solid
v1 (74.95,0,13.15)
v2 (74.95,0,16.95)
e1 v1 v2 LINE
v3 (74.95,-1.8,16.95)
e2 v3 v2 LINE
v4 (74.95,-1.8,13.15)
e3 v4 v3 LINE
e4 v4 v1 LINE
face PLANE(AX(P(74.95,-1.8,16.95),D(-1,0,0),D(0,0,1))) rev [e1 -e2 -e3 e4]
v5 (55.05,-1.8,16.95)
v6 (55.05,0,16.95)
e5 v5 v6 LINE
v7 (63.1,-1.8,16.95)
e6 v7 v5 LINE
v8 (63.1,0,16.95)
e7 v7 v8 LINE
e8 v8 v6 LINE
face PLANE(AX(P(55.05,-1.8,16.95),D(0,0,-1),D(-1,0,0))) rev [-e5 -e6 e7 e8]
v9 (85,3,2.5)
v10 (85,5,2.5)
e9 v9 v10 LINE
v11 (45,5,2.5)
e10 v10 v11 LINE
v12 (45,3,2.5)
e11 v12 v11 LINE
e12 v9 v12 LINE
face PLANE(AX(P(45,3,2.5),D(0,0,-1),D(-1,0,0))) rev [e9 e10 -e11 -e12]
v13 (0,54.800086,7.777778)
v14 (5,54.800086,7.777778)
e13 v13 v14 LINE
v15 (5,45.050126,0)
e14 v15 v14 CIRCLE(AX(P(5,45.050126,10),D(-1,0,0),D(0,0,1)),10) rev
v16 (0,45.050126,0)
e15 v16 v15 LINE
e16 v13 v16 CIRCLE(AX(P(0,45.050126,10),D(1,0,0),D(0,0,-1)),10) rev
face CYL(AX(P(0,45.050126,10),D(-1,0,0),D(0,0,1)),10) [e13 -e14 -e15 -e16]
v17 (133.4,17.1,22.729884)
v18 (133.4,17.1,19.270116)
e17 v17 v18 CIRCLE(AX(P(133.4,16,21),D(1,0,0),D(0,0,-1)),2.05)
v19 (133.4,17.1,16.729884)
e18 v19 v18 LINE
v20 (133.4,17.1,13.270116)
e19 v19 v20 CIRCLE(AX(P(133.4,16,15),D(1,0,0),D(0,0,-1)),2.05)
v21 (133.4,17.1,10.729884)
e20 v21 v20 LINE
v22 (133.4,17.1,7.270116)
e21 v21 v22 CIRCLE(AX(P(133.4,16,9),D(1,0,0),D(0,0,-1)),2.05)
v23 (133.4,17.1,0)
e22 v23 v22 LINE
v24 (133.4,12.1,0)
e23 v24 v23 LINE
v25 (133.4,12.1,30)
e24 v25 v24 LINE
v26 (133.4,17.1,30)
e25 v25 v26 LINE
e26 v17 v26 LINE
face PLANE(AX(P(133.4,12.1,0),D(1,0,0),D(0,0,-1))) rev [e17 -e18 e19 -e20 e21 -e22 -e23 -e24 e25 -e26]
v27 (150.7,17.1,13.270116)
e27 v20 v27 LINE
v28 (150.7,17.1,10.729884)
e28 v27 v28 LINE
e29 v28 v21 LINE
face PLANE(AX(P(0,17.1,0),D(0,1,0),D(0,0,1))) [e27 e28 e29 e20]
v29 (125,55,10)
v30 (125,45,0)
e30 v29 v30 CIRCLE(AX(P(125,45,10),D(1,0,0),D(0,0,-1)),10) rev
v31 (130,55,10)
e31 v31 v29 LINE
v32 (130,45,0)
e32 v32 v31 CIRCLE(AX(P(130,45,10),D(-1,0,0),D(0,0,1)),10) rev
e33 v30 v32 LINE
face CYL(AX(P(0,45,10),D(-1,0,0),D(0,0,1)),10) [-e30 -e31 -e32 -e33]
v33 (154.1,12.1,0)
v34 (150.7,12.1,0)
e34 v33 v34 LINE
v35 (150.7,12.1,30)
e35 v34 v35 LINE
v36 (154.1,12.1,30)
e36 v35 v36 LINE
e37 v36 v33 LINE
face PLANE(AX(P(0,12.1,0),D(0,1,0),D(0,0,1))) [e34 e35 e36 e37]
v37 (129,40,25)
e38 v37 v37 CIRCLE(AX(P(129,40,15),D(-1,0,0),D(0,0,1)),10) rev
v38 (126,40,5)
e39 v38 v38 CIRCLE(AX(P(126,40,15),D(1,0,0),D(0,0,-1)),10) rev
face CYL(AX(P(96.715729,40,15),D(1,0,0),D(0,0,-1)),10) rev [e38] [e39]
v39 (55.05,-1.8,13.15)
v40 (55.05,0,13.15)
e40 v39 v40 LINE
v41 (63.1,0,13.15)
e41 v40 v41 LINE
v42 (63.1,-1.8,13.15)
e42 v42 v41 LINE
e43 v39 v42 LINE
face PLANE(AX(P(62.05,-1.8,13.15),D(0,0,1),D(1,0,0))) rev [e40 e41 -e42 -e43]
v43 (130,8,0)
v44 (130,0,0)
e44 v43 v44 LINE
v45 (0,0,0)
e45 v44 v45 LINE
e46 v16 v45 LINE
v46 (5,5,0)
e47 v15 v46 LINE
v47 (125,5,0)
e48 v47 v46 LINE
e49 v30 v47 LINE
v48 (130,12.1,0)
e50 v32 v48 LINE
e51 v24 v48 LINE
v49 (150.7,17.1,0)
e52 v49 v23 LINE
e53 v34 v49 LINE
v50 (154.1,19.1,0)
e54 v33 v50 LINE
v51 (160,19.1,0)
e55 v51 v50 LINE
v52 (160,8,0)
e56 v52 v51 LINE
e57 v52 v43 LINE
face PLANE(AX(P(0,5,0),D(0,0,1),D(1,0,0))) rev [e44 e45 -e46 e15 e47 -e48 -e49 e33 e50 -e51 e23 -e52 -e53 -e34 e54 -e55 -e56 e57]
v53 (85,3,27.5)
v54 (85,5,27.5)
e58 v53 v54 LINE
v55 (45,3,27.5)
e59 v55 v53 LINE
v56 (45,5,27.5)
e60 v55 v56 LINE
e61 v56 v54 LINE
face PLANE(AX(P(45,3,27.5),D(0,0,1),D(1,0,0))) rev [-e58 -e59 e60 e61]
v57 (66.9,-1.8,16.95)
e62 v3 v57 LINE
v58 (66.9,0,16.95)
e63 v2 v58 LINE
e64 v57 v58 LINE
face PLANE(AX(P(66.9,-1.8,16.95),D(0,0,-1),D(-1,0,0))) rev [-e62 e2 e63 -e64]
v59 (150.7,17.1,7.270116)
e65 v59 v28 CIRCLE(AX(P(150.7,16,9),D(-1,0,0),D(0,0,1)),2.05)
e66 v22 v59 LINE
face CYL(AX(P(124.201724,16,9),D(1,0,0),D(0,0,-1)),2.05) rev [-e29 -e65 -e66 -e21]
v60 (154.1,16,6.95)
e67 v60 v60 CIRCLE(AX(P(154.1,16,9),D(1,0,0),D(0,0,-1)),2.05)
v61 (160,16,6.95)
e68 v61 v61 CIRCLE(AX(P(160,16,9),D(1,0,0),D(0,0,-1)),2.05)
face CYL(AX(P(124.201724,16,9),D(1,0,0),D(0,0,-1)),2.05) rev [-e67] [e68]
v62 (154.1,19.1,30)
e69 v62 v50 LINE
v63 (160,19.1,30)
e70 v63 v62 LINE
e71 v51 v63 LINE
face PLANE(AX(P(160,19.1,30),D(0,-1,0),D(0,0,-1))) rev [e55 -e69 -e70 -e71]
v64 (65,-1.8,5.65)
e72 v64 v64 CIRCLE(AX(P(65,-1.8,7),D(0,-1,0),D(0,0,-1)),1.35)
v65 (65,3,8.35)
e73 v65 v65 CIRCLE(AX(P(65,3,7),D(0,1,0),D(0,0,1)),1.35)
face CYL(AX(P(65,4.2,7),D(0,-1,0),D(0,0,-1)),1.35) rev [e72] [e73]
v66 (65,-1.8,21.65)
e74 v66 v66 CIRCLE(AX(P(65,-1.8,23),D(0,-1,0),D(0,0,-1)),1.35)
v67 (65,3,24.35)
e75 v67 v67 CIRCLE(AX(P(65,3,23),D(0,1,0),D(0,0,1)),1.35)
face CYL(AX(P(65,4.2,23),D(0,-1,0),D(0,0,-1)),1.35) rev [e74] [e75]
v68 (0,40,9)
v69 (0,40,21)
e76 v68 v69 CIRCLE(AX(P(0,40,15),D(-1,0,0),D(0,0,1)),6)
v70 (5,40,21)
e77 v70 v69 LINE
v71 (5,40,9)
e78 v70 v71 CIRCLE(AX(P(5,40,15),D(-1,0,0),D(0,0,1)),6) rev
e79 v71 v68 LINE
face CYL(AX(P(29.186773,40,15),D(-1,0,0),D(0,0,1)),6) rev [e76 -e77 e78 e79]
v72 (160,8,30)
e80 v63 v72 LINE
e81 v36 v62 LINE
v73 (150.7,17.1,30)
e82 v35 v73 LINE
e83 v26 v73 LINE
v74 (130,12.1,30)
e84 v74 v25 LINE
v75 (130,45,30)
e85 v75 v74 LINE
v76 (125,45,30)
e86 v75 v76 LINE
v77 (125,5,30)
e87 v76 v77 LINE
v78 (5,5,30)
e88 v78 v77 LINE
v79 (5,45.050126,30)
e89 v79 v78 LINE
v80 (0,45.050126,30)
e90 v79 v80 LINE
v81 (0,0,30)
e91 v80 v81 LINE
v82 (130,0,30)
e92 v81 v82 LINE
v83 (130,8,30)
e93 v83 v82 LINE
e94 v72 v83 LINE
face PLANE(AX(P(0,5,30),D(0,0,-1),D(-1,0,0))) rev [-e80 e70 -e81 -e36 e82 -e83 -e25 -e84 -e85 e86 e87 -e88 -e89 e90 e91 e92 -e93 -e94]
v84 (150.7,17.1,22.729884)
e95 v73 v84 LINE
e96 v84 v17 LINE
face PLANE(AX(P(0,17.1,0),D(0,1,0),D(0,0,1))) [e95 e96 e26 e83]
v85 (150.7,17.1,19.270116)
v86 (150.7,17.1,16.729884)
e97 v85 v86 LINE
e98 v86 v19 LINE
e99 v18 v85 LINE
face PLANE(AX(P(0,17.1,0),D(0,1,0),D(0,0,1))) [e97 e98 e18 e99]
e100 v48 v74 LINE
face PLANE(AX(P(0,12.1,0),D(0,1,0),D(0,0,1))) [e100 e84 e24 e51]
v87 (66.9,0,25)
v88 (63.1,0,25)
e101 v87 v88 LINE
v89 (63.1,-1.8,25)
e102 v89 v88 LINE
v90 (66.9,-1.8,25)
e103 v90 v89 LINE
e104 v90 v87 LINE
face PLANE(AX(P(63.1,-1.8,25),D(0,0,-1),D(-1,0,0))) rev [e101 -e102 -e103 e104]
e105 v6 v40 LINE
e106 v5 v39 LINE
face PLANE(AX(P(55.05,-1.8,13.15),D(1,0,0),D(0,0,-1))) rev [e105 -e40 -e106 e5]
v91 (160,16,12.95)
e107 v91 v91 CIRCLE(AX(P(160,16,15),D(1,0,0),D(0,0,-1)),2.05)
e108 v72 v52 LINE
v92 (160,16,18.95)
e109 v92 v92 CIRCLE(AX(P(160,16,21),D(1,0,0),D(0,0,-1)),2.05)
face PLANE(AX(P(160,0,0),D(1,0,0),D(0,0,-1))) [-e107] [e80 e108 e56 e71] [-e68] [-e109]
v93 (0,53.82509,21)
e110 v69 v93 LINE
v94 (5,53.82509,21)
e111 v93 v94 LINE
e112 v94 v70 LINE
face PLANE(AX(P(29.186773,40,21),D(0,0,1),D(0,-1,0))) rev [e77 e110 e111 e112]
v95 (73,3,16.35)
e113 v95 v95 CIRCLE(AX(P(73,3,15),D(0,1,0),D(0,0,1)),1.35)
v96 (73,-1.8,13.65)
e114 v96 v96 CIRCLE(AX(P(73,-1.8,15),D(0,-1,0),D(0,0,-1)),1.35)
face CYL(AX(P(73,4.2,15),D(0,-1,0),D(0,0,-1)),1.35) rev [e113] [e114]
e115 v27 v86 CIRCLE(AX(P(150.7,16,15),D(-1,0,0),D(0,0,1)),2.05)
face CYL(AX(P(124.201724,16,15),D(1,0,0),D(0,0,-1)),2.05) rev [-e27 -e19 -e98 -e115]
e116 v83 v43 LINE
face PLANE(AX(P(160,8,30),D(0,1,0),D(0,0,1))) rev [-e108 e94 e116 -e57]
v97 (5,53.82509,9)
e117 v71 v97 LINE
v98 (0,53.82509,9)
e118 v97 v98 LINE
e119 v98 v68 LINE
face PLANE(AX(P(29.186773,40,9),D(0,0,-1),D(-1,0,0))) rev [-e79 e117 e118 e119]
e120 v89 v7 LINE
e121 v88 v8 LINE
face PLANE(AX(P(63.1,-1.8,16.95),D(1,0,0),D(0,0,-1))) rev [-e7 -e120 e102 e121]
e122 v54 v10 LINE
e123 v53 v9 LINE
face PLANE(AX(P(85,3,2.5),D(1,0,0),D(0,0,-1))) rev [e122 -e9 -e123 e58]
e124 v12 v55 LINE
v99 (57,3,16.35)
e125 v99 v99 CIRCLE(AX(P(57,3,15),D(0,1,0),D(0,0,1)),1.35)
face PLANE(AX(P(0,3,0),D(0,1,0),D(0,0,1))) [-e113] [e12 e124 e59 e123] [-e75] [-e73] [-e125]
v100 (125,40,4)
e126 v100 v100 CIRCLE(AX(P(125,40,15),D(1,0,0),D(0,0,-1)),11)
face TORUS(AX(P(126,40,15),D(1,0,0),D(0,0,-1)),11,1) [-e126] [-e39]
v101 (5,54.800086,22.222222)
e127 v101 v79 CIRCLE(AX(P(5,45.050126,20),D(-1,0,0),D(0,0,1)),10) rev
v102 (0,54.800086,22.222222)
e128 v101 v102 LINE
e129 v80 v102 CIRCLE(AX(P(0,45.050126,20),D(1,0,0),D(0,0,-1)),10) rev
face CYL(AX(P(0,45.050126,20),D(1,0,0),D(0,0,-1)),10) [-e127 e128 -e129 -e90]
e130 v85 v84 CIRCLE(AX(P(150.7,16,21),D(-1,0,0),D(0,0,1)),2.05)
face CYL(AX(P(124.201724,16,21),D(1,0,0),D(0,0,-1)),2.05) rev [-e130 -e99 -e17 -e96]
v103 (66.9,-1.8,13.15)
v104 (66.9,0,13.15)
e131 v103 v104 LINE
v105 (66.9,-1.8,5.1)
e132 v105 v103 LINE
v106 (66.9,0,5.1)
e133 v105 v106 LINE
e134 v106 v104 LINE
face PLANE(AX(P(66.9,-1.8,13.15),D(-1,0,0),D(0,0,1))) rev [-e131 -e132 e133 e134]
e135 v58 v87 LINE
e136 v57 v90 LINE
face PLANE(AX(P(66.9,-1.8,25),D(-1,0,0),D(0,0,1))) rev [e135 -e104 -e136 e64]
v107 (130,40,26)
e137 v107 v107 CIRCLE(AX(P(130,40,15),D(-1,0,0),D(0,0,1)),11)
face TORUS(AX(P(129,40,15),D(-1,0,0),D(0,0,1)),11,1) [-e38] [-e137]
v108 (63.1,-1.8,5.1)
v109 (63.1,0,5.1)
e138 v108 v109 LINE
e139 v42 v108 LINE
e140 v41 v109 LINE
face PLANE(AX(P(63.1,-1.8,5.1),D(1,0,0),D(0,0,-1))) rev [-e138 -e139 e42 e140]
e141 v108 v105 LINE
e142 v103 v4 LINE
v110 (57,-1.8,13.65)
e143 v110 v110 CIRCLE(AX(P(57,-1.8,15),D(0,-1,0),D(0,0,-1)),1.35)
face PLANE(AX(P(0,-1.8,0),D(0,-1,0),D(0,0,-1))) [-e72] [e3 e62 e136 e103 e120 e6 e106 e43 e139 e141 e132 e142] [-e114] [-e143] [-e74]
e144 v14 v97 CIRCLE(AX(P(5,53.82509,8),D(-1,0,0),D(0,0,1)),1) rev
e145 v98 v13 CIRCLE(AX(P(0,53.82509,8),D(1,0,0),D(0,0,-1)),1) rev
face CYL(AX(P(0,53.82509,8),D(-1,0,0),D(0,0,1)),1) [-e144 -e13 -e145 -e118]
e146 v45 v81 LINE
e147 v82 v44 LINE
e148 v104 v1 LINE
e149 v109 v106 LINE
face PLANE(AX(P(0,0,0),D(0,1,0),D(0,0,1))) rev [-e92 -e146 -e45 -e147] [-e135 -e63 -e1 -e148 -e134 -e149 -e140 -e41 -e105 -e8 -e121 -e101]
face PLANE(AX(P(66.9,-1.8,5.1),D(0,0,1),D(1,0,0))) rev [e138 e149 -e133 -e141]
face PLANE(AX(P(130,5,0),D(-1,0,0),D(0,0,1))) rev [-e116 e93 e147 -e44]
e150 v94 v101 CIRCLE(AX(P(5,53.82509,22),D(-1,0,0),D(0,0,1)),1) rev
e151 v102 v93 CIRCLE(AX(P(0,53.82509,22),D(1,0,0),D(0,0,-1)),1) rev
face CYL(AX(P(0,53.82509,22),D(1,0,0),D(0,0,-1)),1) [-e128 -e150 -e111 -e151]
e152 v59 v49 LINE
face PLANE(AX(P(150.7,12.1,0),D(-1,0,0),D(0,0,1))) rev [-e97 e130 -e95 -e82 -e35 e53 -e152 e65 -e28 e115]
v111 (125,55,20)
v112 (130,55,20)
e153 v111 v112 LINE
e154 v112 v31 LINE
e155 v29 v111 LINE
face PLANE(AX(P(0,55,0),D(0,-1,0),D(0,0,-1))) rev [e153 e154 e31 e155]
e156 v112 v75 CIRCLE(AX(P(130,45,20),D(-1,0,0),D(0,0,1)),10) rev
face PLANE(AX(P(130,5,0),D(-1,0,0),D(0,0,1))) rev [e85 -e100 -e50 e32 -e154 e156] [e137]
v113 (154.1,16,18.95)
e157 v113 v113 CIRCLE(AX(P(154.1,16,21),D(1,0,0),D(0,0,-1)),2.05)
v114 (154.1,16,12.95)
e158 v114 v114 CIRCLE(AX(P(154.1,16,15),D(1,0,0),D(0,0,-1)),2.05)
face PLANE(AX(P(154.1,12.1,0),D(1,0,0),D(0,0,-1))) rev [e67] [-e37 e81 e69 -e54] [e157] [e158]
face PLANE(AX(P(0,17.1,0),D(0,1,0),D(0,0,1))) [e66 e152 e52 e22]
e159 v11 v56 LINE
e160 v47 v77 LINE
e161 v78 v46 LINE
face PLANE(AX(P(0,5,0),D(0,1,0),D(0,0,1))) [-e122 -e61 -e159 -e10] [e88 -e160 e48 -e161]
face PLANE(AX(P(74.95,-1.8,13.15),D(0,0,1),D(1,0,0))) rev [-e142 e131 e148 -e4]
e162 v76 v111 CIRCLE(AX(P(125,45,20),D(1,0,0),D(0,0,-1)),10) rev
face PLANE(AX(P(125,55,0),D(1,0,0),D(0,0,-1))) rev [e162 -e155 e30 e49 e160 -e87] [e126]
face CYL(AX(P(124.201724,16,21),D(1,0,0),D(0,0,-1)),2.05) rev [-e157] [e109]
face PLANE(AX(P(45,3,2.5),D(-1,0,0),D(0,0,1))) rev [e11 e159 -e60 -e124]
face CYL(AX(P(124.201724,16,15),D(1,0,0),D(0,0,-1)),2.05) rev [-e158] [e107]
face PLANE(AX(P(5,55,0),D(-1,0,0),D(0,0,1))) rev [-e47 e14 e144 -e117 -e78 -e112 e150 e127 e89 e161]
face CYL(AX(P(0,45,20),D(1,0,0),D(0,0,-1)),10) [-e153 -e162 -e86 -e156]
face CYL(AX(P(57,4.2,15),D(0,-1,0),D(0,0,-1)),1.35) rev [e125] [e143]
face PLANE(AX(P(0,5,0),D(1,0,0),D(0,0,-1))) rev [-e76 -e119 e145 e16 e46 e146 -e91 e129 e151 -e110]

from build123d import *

# Parameters (mm, degrees)
SKETCH1_W           = 130
SKETCH1_H           = 30
BOSS_EXTRUDE1_DEPTH = 5
BOSS_EXTRUDE3_DEPTH = 1.8
SKETCH6_W           = 40
SKETCH6_H           = 25
CUT_EXTRUDE2_DEPTH  = 2
SKETCH5_R           = 1.35
CUT_EXTRUDE3_DEPTH  = 6
SKETCH8_W           = 5
SKETCH8_H           = 30
BOSS_EXTRUDE4_DEPTH = 50
SKETCH9_R           = 10
CUT_EXTRUDE4_DEPTH  = 5
SKETCH10_W          = 30
SKETCH10_H          = 11.1
BOSS_EXTRUDE5_DEPTH = 30
SKETCH11_W          = 3.4
SKETCH11_H          = 30
CUT_EXTRUDE5_DEPTH  = 7
CUT_EXTRUDE6_REACH  = 173.828
SKETCH12_R          = 2.05
CUT_EXTRUDE7_DEPTH  = 5
SKETCH14_W          = 17.3
SKETCH14_H          = 30
CUT_EXTRUDE8_DEPTH  = 2
FILLET1_R           = 10
FILLET3_R           = 1
FILLET6_R           = 1


with BuildPart() as part:
    # Sketch1 → Boss-Extrude1 (new body)
    with BuildSketch(Plane(origin=(0, 0, 0), x_dir=(1, 0, 0), z_dir=(0, 1, 0))):
        with Locations((65, -15)):
            Rectangle(SKETCH1_W, SKETCH1_H)
    extrude(amount=BOSS_EXTRUDE1_DEPTH)

    # Sketch4 → Boss-Extrude3 (add)
    with BuildSketch(Plane.XZ):
        Polygon((63.1, 25), (66.9, 25), (66.9, 17), (66.9, 16.95), (67.95, 16.95), (74.95, 16.95), (74.95, 13.15), (66.95, 13.15), (66.9, 13.15), (66.9, 12.1), (66.9, 5.1), (63.1, 5.1), (63.1, 13.1), (63.1, 13.15), (62.05, 13.15), (55.05, 13.15), (55.05, 16.95), (63.05, 16.95), (63.1, 16.95), (63.1, 18), align=None)
    extrude(amount=BOSS_EXTRUDE3_DEPTH)

    # Sketch6 → Cut-Extrude2 (cut)
    with BuildSketch(Plane(origin=(0, 5, 0), x_dir=(1, 0, 0), z_dir=(0, 1, 0))):
        with Locations((65, -15)):
            Rectangle(SKETCH6_W, SKETCH6_H)
    extrude(amount=-CUT_EXTRUDE2_DEPTH, mode=Mode.SUBTRACT)

    # Sketch5 → Cut-Extrude3 (cut)
    with BuildSketch(Plane.XZ.offset(1.8)):
        with Locations(Location((65, 23, 0), (0, 0, 270))):
            Circle(SKETCH5_R)
        with Locations(Location((73, 15, 0), (0, 0, 270))):
            Circle(SKETCH5_R)
        with Locations(Location((57, 15, 0), (0, 0, 270))):
            Circle(SKETCH5_R)
        with Locations(Location((65, 7, 0), (0, 0, 270))):
            Circle(SKETCH5_R)
    extrude(amount=-CUT_EXTRUDE3_DEPTH, mode=Mode.SUBTRACT)

    # Sketch8 → Boss-Extrude4 (add)
    with BuildSketch(Plane(origin=(0, 5, 0), x_dir=(1, 0, 0), z_dir=(0, 1, 0))):
        with Locations((2.5, -15)):
            Rectangle(SKETCH8_W, SKETCH8_H)
        with Locations((127.5, -15)):
            Rectangle(SKETCH8_W, SKETCH8_H)
    extrude(amount=BOSS_EXTRUDE4_DEPTH)

    # Sketch9 → Cut-Extrude4 (cut)
    with BuildSketch(Plane(origin=(130, 0, 0), x_dir=(0, 0, -1), z_dir=(1, 0, 0))):
        with Locations((-15, 40)):
            Circle(SKETCH9_R)
    extrude(amount=-CUT_EXTRUDE4_DEPTH, mode=Mode.SUBTRACT)

    # Sketch10 → Boss-Extrude5 (add)
    with BuildSketch(Plane(origin=(130, 0, 0), x_dir=(0, 0, -1), z_dir=(1, 0, 0))):
        with Locations((-15, 13.55)):
            Rectangle(SKETCH10_W, SKETCH10_H)
    extrude(amount=BOSS_EXTRUDE5_DEPTH)

    # Sketch11 → Cut-Extrude5 (cut)
    with BuildSketch(Plane(origin=(0, 19.1, 0), x_dir=(1, 0, 0), z_dir=(0, 1, 0))):
        with Locations((131.7, -15)):
            Rectangle(SKETCH11_W, SKETCH11_H)
        with Locations((152.4, -15)):
            Rectangle(SKETCH11_W, SKETCH11_H)
    extrude(amount=-CUT_EXTRUDE5_DEPTH, mode=Mode.SUBTRACT)

    # Cut-Extrude6: up to this face of the body (flat: up to its plane)
    cut_extrude6_end = Plane(part.part.faces().sort_by_distance((130, 12.623489255, 15))[0])
    # Sketch12 → Cut-Extrude6 (cut, up to the picked face)
    with BuildSketch(Plane(origin=(160, 0, 0), x_dir=(0, 0, -1), z_dir=(1, 0, 0)), mode=Mode.PRIVATE) as cut_extrude6_sk1:
        with Locations((-15, 16)):
            Circle(SKETCH12_R)
    cut_extrude6_tool1 = split(extrude(cut_extrude6_sk1.sketch, amount=-CUT_EXTRUDE6_REACH, mode=Mode.PRIVATE), bisect_by=cut_extrude6_end, keep=Keep.BOTH, mode=Mode.PRIVATE)
    # Sketch12 → Cut-Extrude6 (cut, up to the picked face)
    with BuildSketch(Plane(origin=(160, 0, 0), x_dir=(0, 0, -1), z_dir=(1, 0, 0)), mode=Mode.PRIVATE) as cut_extrude6_sk2:
        with Locations((-21, 16)):
            Circle(SKETCH12_R)
    cut_extrude6_tool2 = split(extrude(cut_extrude6_sk2.sketch, amount=-CUT_EXTRUDE6_REACH, mode=Mode.PRIVATE), bisect_by=cut_extrude6_end, keep=Keep.BOTH, mode=Mode.PRIVATE)
    # Sketch12 → Cut-Extrude6 (cut, up to the picked face)
    with BuildSketch(Plane(origin=(160, 0, 0), x_dir=(0, 0, -1), z_dir=(1, 0, 0)), mode=Mode.PRIVATE) as cut_extrude6_sk3:
        with Locations((-9, 16)):
            Circle(SKETCH12_R)
    cut_extrude6_tool3 = split(extrude(cut_extrude6_sk3.sketch, amount=-CUT_EXTRUDE6_REACH, mode=Mode.PRIVATE), bisect_by=cut_extrude6_end, keep=Keep.BOTH, mode=Mode.PRIVATE)
    add(cut_extrude6_tool1.solids().sort_by(Axis((160, 16, 15), (-1, 0, 0)))[0], mode=Mode.SUBTRACT)
    add(cut_extrude6_tool2.solids().sort_by(Axis((160, 16, 21), (-1, 0, 0)))[0], mode=Mode.SUBTRACT)
    add(cut_extrude6_tool3.solids().sort_by(Axis((160, 16, 9), (-1, 0, 0)))[0], mode=Mode.SUBTRACT)

    # Sketch13 → Cut-Extrude7 (cut)
    with BuildSketch(Plane.ZY):
        with BuildLine():
            Line((9, 40), (9, 55))
            Line((9, 55), (21, 55))
            Line((21, 55), (21, 40))
            ThreePointArc((21, 40), (15, 34), (9, 40))
        make_face()
    extrude(amount=-CUT_EXTRUDE7_DEPTH, mode=Mode.SUBTRACT)

    # Sketch14 → Cut-Extrude8 (cut)
    with BuildSketch(Plane(origin=(0, 19.1, 0), x_dir=(1, 0, 0), z_dir=(0, 1, 0))):
        with Locations((142.05, -15)):
            Rectangle(SKETCH14_W, SKETCH14_H)
    extrude(amount=-CUT_EXTRUDE8_DEPTH, mode=Mode.SUBTRACT)

    # Fillet1
    # the kernel refuses this fillet: 10 mm, written as the material it takes off along each edge
    with BuildSketch(Plane(origin=(-24.874685928, 55, 0), x_dir=(0, -1, 0), z_dir=(1, 0, 0)), Plane(origin=(29.874685928, 55, 30), x_dir=(0, -1, 0), z_dir=(-1, 0, 0))) as fillet1_piece_1:
        with BuildLine():
            CenterArc((9.949874371, -10), FILLET1_R, 90, 84.260829523)
            Line((0, -9), (-0.198997487, -8.98))
            ThreePointArc((-0.198997487, -8.98), (-0.2, -4.5), (-0.2, 0))
            Line((-0.2, 0), (0, 0.2))
            Line((0, 0.2), (9.949874371, 0.2))
            Line((9.949874371, 0.2), (9.949874371, 0))
        make_face()
    extrude(amount=54.749371855, mode=Mode.SUBTRACT)
    with BuildSketch(Plane(origin=(155, 55, 0), x_dir=(0, -1, 0), z_dir=(-1, 0, 0)), Plane(origin=(100, 55, 30), x_dir=(0, -1, 0), z_dir=(1, 0, 0))) as fillet1_piece_2:
        with BuildLine():
            CenterArc((FILLET1_R, FILLET1_R), FILLET1_R, 180, 90)
            Line((0, FILLET1_R), (-FILLET1_R * 0.02, FILLET1_R))
            Line((-FILLET1_R * 0.02, FILLET1_R), (-FILLET1_R * 0.02, -FILLET1_R * 0.02))
            Line((-FILLET1_R * 0.02, -FILLET1_R * 0.02), (FILLET1_R, -FILLET1_R * 0.02))
            Line((FILLET1_R, -FILLET1_R * 0.02), (FILLET1_R, 0))
        make_face()
    extrude(amount=55, mode=Mode.SUBTRACT)

    # Fillet3
    fillet3_edges = [part.edges().sort_by_distance(p)[0] for p in [
        (2.5, 55, 9),
        (2.5, 55, 21),
    ]]
    fillet(fillet3_edges, radius=FILLET3_R)

    # Fillet6
    fillet6_edges = [part.edges().sort_by_distance(p)[0] for p in [
        (130, 40, 25),
        (125, 40, 25),
    ]]
    fillet(fillet6_edges, radius=FILLET6_R)


solid = part.part
